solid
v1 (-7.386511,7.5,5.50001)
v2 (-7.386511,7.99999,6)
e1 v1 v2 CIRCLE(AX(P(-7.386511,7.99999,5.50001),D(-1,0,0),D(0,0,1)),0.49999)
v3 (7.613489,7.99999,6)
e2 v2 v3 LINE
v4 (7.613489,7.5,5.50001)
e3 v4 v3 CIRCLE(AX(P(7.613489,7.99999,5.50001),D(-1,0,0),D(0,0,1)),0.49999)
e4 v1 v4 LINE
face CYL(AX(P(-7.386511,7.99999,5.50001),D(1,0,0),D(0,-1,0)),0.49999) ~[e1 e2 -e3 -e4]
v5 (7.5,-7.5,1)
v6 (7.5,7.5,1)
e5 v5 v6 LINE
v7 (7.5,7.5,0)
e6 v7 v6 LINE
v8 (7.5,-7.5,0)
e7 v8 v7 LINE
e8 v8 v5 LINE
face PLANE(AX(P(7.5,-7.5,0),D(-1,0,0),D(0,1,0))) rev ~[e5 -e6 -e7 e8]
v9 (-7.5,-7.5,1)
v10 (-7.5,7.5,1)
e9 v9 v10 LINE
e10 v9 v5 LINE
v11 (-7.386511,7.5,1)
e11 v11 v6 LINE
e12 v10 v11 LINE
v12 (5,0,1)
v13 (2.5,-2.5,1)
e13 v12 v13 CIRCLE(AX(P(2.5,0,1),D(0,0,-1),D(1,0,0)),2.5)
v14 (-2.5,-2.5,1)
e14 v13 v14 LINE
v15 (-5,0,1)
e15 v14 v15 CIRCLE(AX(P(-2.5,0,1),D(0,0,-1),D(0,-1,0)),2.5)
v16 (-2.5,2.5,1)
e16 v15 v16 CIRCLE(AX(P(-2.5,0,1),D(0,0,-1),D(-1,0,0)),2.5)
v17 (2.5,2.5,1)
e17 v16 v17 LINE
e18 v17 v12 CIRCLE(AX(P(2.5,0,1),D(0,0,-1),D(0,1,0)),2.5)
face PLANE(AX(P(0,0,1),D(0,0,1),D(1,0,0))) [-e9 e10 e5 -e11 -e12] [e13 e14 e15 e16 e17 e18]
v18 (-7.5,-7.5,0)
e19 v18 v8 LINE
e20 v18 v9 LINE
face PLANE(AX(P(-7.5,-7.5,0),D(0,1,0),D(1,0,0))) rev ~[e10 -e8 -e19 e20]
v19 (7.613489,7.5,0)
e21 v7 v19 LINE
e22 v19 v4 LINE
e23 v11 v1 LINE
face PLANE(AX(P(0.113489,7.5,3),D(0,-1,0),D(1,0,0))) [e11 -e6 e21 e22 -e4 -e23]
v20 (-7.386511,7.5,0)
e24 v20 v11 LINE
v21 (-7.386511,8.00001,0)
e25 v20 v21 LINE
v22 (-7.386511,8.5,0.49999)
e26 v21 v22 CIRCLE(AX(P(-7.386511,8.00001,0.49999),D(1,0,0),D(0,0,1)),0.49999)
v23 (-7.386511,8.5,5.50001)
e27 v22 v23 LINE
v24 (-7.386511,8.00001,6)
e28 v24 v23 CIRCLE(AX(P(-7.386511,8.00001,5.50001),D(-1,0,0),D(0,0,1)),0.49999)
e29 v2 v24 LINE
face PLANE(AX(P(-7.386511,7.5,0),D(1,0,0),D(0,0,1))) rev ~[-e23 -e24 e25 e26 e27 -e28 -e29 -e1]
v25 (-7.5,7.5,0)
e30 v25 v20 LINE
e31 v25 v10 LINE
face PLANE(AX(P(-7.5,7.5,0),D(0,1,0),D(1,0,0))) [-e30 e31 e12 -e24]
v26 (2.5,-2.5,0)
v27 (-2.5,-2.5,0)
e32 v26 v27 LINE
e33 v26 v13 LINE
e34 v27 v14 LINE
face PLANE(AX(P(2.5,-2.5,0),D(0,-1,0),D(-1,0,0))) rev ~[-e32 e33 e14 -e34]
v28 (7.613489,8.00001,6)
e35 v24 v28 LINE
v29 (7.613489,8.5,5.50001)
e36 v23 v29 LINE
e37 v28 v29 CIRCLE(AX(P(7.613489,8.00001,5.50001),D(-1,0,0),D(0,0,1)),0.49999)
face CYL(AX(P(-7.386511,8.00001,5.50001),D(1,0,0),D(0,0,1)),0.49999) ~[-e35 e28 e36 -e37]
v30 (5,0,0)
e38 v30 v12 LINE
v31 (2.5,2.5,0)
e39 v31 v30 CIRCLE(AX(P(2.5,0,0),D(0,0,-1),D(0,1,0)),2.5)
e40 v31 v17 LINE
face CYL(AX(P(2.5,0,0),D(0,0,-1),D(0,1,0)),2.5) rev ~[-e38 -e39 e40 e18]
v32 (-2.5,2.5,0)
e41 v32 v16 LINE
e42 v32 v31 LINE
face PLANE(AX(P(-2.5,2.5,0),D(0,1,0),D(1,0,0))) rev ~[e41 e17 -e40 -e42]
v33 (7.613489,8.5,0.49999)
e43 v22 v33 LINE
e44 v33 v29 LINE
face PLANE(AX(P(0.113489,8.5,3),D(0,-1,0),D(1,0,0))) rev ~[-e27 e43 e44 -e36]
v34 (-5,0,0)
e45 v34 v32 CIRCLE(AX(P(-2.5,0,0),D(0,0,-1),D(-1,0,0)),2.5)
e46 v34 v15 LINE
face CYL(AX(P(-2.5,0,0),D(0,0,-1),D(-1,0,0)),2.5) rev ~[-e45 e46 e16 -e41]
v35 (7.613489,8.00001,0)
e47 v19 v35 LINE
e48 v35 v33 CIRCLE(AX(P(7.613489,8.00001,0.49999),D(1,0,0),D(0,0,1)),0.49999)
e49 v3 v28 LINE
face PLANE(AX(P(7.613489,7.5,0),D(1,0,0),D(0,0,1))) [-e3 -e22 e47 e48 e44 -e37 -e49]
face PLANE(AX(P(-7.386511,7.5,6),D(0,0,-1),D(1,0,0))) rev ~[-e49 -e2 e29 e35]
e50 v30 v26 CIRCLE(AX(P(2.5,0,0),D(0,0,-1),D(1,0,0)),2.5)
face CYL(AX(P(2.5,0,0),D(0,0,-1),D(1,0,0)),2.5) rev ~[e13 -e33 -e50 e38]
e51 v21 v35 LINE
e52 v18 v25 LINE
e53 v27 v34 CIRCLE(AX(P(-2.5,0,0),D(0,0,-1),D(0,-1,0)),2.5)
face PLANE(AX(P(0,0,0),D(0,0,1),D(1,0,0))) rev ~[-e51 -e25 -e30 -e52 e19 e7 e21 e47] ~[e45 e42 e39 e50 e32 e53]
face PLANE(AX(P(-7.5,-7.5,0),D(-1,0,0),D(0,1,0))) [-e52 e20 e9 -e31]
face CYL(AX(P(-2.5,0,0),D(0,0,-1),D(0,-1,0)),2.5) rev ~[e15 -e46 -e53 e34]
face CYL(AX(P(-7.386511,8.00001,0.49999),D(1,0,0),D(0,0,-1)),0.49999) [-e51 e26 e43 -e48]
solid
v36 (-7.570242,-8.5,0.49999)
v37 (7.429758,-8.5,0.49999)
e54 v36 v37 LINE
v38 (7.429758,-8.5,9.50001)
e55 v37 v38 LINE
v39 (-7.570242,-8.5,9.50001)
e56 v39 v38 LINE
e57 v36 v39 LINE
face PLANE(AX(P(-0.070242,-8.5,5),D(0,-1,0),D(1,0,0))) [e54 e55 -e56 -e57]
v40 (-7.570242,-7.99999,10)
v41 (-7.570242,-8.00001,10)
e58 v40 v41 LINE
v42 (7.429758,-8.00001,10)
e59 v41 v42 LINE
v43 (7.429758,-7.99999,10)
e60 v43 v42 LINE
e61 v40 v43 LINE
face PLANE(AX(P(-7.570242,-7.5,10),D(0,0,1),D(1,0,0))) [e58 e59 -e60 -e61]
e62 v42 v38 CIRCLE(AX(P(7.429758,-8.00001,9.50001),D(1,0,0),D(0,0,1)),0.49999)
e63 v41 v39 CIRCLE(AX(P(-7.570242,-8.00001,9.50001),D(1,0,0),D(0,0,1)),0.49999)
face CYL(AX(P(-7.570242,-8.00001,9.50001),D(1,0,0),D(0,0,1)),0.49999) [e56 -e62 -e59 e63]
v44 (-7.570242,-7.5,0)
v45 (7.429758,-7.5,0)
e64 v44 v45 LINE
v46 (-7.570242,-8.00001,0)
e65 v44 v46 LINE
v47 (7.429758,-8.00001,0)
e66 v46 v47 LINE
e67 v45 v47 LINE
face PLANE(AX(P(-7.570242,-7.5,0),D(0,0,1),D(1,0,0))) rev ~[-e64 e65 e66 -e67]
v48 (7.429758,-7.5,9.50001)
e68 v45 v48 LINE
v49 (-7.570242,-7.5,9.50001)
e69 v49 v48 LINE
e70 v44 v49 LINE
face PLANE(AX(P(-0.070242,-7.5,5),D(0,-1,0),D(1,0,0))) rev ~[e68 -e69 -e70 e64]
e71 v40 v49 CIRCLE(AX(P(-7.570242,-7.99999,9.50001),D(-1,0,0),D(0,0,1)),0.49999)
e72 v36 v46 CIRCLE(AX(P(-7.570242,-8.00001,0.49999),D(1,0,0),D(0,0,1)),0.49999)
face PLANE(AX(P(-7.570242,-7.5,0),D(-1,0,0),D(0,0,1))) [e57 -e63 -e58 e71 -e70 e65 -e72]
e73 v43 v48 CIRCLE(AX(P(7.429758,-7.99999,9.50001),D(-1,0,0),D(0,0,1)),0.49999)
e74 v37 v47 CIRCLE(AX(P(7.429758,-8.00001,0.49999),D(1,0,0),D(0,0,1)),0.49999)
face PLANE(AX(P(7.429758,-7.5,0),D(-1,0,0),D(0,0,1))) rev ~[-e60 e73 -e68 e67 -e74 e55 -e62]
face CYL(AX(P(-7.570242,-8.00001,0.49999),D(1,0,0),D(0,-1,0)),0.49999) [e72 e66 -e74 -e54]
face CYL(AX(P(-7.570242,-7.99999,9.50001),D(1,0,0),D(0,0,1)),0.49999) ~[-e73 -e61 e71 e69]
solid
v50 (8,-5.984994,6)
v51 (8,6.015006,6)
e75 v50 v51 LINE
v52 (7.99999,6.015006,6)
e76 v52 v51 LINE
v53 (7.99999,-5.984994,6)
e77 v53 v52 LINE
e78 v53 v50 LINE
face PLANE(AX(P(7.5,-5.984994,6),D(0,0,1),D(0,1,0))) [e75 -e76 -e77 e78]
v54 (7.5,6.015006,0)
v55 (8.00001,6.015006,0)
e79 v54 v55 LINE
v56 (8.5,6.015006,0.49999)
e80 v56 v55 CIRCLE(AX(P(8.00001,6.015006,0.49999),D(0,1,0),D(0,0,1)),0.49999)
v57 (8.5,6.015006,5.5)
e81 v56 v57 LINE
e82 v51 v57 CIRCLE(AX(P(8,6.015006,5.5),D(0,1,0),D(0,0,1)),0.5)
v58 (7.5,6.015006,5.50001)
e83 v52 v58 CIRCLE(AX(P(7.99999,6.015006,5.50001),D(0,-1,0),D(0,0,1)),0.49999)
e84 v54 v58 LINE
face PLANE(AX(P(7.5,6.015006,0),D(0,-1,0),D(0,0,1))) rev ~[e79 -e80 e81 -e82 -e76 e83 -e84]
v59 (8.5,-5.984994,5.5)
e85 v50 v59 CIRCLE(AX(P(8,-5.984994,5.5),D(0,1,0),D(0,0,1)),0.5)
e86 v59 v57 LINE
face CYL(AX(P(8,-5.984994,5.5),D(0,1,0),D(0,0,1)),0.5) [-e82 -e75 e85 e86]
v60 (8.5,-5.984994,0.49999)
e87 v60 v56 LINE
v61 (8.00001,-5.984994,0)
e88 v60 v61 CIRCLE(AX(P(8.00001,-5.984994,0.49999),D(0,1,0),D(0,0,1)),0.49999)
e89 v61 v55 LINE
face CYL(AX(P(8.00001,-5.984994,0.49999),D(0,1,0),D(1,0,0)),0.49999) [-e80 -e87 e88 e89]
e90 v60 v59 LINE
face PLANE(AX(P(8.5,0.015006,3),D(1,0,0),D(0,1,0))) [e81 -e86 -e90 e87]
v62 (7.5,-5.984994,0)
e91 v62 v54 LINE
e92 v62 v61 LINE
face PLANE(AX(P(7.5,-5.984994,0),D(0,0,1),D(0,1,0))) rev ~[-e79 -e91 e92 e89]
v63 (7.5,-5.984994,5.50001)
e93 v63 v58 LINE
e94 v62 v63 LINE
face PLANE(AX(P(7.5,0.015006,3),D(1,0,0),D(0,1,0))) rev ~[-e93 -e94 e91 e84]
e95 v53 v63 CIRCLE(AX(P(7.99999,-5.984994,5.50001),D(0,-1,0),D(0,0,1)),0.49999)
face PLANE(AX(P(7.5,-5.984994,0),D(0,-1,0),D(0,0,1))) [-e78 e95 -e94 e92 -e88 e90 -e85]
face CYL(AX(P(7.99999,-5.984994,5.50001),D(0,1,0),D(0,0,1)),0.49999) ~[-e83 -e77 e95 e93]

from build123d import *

# Parameters (mm, degrees)
F9_W      = 12
F9_H      = 6
F10_DEPTH = 1
F8_W      = 15
F8_H      = 6
F11_DEPTH = 1
F7_W      = 15
F7_H      = 10
F12_DEPTH = 1
F0_W      = 15
F0_H      = 15
F13_DEPTH = 1
F14_R     = 0.5
F15_R     = 0.49999
F15_2_R   = 0.49999
F16_R     = 0.49999
F16_2_R   = 0.49999
F17_DEPTH = 1


# Not quite as in the source:
# - a fillet or chamfer is up to 0.001 mm smaller than in the source, because OpenCascade refuses the exact size


with BuildPart() as f10:
    # F9 (on plane+point) → F10 (new body)
    with BuildSketch(Plane.YZ.offset(7.5)):
        with Locations((0.0150063767, 3)):
            Rectangle(F9_W, F9_H)
    extrude(amount=F10_DEPTH)

    # F14
    f14_edges = [f10.edges().sort_by_distance(p)[0] for p in [
        (8.5, 0.015006, 6),
    ]]
    fillet(f14_edges, radius=F14_R)

    # F15 (radius 0.5 in the source; OpenCascade refuses exactly that, so slightly less here)
    f15_edges = [f10.edges().sort_by_distance(p)[0] for p in [
        (7.5, 0.015006, 6),
        (8.5, 0.015006, 0),
    ]]
    fillet(f15_edges, radius=F15_R)

    # F0 (on Top) → F17 (cut)
    with BuildSketch(Plane.XY):
        with BuildLine():
            Line((2.5, 2.5), (-2.5, 2.5))
            ThreePointArc((-2.5, 2.5), (-4.267766953, 1.767766953), (-5, 0))
            ThreePointArc((-5, 0), (-4.267766953, -1.767766953), (-2.5, -2.5))
            Line((-2.5, -2.5), (2.5, -2.5))
            ThreePointArc((2.5, -2.5), (4.267766953, -1.767766953), (5, 0))
            ThreePointArc((5, 0), (4.267766953, 1.767766953), (2.5, 2.5))
        make_face()
    extrude(amount=F17_DEPTH, mode=Mode.SUBTRACT)


with BuildPart() as f11:
    # F8 (on plane+point) → F11 (new body)
    with BuildSketch(Plane.XZ.offset(-7.5)):
        with Locations((0.1134890686, 3)):
            Rectangle(F8_W, F8_H)
    extrude(amount=-F11_DEPTH)

    # F0 (on Top) → F13 (join)
    with BuildSketch(Plane.XY):
        Rectangle(F0_W, F0_H)
        with BuildLine():
            ThreePointArc((-5, 0), (-4.267766953, 1.767766953), (-2.5, 2.5))
            Line((-2.5, 2.5), (2.5, 2.5))
            ThreePointArc((2.5, 2.5), (4.267766953, 1.767766953), (5, 0))
            ThreePointArc((5, 0), (4.267766953, -1.767766953), (2.5, -2.5))
            Line((2.5, -2.5), (-2.5, -2.5))
            ThreePointArc((-2.5, -2.5), (-4.267766953, -1.767766953), (-5, 0))
        make_face(mode=Mode.SUBTRACT)
    extrude(amount=F13_DEPTH)

    # F16#2 (radius 0.5 in the source; OpenCascade refuses exactly that, so slightly less here)
    f16_2_edges = [f11.edges().sort_by_distance(p)[0] for p in [
        (0.113489, 8.5, 0),
        (0.113489, 8.5, 6),
        (0.113489, 7.5, 6),
    ]]
    fillet(f16_2_edges, radius=F16_2_R)


with BuildPart() as f12:
    # F7 (on plane+point) → F12 (new body)
    with BuildSketch(Plane.XZ.offset(7.5)):
        with Locations((-0.0702422911, 5)):
            Rectangle(F7_W, F7_H)
    extrude(amount=F12_DEPTH)

    # F15#2 (radius 0.5 in the source; OpenCascade refuses exactly that, so slightly less here)
    f15_2_edges = [f12.edges().sort_by_distance(p)[0] for p in [
        (-0.070242, -8.5, 10),
        (-0.070242, -7.5, 10),
    ]]
    fillet(f15_2_edges, radius=F15_2_R)

    # F16 (radius 0.5 in the source; OpenCascade refuses exactly that, so slightly less here)
    f16_edges = [f12.edges().sort_by_distance(p)[0] for p in [
        (-0.070242, -8.5, 0),
    ]]
    fillet(f16_edges, radius=F16_R)


solid = Compound([f10.part, f11.part, f12.part])
